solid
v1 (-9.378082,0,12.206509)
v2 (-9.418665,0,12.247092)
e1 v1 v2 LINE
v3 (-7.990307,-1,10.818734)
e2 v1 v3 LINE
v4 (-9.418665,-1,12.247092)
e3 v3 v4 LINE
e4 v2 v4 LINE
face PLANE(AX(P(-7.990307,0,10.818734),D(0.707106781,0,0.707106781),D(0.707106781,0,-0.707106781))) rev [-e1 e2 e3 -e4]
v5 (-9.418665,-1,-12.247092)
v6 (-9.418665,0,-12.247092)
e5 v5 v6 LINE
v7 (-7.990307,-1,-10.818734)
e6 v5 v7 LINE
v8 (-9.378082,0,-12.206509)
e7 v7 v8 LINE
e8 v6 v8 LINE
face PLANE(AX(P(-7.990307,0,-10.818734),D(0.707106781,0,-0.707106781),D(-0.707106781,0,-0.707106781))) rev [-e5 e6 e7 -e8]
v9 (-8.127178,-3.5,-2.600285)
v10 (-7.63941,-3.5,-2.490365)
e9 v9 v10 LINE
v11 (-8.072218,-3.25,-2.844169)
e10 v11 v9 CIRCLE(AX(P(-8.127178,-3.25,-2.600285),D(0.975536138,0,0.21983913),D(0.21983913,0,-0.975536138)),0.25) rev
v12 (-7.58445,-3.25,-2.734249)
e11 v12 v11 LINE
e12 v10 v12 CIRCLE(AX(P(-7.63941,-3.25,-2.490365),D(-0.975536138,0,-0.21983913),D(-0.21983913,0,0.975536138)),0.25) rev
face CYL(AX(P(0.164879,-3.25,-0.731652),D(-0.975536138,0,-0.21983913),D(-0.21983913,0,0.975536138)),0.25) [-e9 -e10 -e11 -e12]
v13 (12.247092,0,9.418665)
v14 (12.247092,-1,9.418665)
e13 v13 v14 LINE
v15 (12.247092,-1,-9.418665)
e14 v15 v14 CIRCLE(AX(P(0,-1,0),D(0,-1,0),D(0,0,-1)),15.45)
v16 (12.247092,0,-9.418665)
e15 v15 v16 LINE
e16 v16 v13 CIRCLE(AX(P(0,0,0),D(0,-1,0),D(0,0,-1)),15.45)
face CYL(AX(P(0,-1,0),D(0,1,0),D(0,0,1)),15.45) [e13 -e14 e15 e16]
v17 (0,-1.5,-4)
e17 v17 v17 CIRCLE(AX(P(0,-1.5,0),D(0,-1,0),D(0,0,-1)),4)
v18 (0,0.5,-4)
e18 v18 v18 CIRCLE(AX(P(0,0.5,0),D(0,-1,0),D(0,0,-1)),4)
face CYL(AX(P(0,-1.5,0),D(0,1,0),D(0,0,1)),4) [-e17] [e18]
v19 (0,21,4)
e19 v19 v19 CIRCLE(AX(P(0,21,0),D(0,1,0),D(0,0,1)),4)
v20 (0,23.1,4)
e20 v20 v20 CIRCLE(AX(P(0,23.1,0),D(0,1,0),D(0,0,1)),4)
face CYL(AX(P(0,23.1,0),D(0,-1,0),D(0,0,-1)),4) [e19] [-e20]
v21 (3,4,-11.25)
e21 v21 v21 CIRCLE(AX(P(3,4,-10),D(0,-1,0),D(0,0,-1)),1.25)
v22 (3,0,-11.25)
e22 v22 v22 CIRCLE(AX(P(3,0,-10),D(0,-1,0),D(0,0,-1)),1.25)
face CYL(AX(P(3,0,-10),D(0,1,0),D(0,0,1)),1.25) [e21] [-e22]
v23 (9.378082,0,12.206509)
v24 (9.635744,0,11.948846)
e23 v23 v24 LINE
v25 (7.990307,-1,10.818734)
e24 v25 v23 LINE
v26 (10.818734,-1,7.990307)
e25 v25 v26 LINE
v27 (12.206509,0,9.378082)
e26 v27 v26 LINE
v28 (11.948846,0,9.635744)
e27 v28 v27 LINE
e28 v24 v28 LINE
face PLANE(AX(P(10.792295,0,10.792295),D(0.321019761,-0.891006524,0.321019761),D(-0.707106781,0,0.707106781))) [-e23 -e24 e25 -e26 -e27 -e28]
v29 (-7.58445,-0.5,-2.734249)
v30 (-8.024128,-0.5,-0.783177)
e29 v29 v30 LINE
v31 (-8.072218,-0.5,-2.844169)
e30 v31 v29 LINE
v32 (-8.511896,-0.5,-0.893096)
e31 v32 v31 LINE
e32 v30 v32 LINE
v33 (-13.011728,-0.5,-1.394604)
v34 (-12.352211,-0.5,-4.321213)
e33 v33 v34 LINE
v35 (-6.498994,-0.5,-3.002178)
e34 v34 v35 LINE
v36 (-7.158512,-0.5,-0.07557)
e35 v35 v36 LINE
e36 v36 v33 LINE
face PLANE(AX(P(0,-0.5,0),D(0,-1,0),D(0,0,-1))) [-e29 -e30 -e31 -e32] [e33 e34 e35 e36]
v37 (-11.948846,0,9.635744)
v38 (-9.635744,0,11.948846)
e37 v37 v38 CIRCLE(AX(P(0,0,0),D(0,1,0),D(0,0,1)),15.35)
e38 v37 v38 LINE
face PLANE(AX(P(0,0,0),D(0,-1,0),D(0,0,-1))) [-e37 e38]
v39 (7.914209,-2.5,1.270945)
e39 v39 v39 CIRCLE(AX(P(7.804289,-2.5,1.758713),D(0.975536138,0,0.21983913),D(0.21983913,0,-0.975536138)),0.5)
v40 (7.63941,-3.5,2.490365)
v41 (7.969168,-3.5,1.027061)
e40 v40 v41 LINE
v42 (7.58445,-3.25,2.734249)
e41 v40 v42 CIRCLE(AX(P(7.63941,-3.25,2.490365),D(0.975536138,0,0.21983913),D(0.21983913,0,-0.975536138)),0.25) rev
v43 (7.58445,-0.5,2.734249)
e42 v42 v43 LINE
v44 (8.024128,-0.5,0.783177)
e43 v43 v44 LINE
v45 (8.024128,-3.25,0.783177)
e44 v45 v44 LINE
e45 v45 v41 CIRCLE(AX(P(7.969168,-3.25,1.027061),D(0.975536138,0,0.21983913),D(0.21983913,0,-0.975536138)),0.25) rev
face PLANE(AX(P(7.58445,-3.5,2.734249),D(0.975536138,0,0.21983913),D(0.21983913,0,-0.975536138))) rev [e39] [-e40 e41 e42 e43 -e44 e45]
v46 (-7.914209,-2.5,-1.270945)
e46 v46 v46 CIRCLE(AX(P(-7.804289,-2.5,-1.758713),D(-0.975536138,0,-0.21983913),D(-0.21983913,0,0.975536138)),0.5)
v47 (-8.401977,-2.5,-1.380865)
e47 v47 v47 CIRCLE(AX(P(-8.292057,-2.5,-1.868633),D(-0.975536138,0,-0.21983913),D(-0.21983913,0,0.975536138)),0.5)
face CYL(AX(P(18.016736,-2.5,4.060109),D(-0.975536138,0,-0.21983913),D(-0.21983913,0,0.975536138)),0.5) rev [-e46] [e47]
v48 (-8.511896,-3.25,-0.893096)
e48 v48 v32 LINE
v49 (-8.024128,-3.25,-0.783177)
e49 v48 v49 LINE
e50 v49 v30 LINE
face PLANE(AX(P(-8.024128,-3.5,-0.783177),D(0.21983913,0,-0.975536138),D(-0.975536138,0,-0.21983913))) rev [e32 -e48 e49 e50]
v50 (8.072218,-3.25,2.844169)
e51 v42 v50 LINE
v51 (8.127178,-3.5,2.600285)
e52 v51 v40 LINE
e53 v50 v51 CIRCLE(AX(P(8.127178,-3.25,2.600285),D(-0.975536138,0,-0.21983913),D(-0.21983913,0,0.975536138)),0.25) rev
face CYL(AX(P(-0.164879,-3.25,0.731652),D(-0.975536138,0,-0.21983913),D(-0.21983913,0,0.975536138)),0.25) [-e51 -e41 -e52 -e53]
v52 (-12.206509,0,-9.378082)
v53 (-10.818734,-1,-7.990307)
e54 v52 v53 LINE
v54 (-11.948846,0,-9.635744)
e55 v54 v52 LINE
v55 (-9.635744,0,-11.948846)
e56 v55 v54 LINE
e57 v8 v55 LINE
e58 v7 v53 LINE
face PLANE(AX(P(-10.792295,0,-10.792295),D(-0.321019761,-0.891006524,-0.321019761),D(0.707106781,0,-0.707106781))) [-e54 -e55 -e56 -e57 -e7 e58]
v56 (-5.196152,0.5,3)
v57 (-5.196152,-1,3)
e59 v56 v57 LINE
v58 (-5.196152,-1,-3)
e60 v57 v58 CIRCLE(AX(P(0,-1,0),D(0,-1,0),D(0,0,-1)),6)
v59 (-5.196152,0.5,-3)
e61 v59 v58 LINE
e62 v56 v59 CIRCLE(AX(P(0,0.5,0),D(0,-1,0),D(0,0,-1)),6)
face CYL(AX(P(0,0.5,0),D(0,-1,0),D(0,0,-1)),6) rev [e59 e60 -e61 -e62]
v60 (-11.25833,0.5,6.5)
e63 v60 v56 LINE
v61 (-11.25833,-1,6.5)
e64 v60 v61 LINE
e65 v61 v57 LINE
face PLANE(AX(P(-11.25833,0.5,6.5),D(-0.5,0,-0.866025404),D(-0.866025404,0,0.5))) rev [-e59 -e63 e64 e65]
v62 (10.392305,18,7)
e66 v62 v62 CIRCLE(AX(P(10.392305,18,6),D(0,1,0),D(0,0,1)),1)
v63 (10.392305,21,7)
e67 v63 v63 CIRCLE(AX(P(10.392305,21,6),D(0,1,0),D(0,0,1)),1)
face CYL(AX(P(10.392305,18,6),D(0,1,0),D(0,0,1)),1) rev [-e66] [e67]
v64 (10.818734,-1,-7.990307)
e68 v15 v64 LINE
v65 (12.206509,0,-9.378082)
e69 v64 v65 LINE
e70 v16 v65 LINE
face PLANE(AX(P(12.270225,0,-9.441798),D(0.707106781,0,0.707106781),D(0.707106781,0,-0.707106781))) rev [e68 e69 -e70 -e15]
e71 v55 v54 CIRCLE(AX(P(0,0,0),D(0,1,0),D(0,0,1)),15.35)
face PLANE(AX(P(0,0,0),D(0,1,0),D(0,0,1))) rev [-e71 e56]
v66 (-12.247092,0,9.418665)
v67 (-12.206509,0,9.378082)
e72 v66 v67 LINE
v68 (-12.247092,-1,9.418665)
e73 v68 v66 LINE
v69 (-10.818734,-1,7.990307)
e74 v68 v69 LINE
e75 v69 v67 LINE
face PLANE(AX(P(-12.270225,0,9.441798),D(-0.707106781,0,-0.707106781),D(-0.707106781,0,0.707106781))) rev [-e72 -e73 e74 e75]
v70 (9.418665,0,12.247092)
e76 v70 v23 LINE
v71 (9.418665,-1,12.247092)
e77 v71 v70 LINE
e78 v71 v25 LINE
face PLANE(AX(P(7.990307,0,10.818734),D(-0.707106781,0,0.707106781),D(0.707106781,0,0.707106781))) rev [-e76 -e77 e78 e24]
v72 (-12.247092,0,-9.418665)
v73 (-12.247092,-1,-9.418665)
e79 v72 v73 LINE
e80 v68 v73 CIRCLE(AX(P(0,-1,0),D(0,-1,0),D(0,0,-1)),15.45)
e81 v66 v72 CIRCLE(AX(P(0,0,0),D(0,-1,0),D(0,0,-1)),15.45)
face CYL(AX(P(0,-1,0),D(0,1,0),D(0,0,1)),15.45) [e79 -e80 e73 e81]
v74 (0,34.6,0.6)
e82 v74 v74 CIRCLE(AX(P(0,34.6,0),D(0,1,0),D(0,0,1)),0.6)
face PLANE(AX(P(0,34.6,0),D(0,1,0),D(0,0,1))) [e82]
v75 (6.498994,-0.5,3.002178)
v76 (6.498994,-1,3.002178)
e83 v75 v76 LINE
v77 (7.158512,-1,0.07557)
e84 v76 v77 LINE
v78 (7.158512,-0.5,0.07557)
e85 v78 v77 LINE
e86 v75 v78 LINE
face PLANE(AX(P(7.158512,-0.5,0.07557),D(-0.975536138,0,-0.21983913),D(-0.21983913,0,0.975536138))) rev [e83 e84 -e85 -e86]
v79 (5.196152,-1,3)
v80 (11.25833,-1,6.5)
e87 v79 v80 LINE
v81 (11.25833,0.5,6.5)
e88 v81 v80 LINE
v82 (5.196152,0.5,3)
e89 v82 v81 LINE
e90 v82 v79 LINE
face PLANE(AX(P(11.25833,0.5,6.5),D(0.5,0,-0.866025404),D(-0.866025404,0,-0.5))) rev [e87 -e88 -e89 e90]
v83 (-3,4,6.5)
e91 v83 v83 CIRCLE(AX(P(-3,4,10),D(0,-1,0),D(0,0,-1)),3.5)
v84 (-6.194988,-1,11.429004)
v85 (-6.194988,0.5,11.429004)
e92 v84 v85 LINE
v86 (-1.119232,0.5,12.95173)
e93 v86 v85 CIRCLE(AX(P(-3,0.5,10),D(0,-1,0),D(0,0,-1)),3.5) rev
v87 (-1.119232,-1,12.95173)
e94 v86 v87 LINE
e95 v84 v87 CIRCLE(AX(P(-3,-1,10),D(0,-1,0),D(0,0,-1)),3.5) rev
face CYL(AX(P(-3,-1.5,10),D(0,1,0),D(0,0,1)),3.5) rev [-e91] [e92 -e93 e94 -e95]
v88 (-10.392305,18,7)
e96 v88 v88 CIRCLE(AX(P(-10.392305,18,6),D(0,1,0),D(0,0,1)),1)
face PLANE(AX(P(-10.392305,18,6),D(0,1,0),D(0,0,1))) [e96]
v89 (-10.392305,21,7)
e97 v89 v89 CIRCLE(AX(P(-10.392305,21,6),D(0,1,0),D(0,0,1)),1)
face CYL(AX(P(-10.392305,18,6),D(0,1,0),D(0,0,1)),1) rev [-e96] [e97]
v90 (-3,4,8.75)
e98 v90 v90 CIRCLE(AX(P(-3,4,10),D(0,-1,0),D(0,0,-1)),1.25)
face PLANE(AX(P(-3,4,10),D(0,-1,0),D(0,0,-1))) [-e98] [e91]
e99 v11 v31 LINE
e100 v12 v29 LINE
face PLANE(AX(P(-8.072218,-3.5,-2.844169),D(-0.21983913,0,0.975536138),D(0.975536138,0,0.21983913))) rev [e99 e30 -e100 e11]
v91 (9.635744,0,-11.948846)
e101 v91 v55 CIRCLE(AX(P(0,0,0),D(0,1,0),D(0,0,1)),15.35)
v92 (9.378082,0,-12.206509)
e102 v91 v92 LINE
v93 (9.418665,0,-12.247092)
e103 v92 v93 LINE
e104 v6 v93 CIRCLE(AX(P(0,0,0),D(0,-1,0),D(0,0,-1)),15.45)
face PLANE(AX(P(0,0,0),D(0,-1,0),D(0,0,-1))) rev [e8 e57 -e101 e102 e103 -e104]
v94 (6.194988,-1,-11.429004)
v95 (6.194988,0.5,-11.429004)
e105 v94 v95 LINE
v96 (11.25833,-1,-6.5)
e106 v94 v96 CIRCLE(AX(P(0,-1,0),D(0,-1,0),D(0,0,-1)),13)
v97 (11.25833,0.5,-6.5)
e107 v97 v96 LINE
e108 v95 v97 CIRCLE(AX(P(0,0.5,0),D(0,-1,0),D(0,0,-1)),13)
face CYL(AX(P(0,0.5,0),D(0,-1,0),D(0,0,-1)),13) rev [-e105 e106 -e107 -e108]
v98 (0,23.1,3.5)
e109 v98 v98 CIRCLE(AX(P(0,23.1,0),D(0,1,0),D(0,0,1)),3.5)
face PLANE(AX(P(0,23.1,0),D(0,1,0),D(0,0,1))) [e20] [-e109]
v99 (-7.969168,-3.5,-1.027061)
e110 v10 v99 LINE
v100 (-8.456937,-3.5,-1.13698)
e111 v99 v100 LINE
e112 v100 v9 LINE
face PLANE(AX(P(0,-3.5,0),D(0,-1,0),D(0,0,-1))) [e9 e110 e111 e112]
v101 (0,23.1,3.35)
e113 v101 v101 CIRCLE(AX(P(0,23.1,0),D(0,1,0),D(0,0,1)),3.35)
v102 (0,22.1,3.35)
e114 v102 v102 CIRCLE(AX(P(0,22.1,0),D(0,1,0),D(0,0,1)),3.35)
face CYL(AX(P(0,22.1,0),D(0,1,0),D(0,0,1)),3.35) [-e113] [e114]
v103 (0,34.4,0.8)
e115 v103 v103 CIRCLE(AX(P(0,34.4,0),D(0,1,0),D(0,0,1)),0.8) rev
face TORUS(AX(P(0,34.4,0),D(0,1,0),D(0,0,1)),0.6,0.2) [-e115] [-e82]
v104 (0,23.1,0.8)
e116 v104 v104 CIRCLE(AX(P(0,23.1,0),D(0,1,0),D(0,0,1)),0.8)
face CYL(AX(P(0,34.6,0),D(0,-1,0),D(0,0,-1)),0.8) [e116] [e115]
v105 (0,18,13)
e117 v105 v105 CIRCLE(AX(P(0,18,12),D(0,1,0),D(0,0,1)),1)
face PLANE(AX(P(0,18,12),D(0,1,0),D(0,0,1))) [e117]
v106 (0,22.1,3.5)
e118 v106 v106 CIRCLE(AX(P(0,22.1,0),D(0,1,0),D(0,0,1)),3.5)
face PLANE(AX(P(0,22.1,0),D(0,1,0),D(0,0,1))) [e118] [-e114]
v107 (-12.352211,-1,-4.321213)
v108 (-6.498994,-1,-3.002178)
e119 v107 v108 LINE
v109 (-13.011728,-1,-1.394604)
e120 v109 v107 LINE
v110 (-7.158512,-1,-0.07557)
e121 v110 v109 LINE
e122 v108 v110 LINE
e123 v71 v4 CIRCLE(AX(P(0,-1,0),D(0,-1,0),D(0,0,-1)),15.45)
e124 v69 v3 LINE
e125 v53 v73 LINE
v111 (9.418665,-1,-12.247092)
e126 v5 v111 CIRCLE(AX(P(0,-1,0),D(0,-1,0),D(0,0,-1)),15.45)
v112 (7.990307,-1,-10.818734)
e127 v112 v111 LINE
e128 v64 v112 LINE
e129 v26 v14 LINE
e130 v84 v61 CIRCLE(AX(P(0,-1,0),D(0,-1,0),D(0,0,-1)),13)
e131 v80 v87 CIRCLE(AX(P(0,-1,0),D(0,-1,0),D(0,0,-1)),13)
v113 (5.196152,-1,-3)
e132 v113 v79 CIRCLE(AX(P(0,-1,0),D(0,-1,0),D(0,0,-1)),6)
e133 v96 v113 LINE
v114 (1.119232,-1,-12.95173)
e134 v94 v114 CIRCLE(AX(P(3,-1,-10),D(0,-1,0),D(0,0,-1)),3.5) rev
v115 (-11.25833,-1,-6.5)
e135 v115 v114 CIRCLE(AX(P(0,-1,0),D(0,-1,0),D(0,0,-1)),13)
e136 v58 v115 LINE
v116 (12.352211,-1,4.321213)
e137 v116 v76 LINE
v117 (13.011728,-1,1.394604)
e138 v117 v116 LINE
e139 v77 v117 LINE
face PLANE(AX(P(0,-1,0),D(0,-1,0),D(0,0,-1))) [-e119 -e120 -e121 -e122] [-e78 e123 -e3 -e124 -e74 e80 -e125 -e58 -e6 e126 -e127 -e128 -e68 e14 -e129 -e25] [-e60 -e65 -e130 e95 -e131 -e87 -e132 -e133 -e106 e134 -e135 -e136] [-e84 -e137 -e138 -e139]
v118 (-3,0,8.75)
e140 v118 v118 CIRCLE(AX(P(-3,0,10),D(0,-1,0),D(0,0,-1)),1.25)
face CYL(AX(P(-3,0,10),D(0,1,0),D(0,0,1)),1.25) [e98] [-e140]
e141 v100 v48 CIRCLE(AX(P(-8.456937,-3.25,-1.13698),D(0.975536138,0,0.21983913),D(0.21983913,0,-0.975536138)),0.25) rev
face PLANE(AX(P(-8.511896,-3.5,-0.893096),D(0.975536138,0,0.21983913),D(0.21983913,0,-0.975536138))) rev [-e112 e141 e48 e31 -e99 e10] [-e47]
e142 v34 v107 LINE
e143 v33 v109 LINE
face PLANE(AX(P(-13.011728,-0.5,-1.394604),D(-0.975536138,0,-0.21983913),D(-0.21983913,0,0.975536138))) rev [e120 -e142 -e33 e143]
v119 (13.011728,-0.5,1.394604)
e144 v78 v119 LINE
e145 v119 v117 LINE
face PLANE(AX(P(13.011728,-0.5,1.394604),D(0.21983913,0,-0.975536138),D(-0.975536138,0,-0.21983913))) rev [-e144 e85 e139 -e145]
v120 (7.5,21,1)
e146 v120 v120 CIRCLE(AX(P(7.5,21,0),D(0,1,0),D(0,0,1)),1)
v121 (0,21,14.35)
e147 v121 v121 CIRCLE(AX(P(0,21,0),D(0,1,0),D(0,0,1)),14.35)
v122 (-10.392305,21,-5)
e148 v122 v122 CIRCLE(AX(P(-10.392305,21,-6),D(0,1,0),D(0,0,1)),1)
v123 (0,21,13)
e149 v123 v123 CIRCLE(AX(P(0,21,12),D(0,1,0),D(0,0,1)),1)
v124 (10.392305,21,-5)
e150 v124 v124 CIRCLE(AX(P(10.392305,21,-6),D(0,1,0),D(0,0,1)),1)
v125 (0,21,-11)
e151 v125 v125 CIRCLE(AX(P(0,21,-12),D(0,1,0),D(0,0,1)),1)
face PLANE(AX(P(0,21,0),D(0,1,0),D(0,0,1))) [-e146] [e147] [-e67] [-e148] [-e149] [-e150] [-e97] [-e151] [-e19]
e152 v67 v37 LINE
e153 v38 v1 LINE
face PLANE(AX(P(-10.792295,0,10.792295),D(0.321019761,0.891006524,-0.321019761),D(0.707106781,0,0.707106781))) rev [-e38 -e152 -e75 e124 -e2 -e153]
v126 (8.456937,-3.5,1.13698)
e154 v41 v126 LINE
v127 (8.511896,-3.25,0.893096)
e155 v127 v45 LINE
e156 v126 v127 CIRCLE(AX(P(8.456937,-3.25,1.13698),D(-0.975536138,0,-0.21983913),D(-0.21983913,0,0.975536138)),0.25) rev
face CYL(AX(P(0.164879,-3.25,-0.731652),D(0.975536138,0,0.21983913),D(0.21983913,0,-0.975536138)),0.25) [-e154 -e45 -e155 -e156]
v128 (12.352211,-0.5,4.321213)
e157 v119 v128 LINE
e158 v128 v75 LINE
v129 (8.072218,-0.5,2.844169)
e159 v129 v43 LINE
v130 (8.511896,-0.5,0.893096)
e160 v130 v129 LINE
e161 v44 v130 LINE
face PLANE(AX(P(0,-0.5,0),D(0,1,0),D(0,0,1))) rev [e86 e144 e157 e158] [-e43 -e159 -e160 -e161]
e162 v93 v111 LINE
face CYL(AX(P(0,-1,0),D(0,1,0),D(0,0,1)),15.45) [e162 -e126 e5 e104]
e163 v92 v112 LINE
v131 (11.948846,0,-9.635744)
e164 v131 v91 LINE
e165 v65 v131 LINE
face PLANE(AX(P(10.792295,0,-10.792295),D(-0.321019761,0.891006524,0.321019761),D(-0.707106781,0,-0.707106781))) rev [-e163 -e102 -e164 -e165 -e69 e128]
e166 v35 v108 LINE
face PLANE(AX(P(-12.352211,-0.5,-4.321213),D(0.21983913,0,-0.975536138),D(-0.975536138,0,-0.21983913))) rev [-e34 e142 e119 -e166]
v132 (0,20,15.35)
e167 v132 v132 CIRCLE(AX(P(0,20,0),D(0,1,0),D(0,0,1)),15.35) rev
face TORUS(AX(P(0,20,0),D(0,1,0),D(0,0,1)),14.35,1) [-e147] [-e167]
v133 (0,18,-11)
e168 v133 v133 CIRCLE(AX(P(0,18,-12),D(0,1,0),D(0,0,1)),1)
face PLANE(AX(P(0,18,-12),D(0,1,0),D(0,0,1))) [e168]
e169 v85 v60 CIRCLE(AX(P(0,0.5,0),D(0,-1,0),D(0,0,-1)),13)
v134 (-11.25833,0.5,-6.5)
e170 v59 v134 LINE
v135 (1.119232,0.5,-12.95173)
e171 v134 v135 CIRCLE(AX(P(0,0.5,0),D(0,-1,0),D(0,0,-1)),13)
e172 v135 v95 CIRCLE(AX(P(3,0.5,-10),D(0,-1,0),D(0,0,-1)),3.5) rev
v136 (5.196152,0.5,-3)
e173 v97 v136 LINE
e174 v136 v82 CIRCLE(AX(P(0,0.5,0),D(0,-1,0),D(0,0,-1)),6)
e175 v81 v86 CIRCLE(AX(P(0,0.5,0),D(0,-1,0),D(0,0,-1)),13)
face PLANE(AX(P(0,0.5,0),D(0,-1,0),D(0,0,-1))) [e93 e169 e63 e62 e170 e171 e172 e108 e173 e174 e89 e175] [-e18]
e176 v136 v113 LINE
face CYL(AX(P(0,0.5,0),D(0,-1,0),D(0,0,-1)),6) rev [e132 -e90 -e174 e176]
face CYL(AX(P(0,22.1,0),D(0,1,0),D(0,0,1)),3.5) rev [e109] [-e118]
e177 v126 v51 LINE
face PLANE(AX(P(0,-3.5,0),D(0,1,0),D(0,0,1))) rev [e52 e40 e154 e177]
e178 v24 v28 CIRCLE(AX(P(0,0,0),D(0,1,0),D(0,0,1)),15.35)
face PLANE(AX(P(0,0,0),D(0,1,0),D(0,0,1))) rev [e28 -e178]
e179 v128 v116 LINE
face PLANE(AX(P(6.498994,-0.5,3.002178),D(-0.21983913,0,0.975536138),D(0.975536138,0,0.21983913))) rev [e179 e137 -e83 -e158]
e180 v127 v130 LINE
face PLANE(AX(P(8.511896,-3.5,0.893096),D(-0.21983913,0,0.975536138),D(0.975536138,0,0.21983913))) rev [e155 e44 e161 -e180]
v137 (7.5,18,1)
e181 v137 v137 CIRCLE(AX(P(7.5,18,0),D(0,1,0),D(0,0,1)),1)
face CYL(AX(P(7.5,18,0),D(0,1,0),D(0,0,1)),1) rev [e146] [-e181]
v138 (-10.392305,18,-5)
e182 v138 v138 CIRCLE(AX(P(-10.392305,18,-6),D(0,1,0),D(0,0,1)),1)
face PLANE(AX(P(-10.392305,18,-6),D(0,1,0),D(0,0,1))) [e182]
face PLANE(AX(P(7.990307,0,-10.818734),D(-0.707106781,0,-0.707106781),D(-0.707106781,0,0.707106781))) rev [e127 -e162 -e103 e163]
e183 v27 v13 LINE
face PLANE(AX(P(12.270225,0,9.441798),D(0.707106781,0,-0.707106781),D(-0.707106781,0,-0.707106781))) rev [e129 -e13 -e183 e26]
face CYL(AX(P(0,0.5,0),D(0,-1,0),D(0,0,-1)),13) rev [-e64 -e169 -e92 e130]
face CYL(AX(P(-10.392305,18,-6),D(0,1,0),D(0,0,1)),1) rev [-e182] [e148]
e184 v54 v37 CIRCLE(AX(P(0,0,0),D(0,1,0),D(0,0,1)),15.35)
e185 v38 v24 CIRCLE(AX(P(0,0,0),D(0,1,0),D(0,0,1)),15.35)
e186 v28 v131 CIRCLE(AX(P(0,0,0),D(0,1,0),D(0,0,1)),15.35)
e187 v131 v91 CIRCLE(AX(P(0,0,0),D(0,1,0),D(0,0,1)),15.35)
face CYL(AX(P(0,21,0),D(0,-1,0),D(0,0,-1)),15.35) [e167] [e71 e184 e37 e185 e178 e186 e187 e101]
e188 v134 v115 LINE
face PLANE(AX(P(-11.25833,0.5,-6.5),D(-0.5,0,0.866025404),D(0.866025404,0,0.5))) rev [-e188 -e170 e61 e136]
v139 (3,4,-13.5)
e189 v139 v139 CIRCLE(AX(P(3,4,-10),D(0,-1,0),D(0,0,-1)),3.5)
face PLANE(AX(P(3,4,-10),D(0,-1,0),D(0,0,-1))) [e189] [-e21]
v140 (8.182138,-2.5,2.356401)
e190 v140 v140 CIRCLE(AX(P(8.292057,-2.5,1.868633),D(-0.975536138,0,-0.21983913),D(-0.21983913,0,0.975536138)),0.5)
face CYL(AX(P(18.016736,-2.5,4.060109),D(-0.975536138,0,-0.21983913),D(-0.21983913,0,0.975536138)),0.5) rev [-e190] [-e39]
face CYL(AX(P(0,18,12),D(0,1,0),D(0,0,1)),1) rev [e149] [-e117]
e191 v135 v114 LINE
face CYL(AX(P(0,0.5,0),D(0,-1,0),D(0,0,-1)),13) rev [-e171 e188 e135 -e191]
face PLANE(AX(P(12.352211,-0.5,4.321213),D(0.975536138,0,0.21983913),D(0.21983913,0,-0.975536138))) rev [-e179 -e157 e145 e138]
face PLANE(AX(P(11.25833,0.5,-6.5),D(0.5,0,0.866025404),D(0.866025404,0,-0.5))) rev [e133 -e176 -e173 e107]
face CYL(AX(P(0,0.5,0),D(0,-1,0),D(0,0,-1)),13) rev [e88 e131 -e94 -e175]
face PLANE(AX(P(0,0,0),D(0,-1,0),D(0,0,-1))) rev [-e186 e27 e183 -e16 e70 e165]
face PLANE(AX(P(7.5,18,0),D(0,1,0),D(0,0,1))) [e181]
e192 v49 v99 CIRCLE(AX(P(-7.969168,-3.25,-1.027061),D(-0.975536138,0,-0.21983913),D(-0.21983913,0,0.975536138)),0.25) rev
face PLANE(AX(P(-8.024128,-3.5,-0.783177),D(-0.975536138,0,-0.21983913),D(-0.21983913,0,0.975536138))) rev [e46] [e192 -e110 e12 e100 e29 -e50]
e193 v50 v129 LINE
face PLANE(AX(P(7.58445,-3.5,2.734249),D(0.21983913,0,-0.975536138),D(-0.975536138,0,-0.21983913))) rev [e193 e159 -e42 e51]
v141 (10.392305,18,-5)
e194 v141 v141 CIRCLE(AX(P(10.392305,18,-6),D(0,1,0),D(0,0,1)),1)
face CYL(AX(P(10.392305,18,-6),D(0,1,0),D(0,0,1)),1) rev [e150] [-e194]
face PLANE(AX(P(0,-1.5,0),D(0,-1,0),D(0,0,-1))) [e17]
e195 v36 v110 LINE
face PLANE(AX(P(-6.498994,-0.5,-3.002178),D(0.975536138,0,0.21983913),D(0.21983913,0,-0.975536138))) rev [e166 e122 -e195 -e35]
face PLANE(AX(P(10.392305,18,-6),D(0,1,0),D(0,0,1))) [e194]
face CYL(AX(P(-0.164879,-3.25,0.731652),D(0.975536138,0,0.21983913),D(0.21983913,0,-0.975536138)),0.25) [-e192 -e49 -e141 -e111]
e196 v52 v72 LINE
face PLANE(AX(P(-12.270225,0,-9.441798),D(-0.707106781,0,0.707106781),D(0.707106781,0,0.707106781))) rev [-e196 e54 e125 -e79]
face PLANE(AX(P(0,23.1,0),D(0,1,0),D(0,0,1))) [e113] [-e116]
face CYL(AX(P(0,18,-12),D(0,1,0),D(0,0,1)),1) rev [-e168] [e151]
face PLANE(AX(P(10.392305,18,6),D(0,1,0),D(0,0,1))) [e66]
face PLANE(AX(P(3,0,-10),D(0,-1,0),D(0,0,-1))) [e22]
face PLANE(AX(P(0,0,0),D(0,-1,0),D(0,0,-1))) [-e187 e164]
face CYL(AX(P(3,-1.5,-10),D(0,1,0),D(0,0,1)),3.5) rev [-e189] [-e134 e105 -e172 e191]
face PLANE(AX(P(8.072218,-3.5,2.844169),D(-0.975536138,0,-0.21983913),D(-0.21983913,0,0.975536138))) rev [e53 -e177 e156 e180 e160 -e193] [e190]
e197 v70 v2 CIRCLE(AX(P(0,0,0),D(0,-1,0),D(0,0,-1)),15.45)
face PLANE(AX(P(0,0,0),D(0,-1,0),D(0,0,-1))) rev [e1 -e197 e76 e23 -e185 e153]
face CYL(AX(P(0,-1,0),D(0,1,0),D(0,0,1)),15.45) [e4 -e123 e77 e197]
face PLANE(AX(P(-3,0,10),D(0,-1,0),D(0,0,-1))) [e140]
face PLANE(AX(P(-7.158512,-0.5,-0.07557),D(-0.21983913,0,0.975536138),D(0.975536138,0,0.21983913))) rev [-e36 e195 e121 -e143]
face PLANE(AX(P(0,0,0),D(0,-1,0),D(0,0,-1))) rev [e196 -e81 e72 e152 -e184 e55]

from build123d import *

# Parameters (mm, degrees)
ESBO_O1_R                  = 15.35
RESSALTO_EXTRUS_O1_DEPTH   = 21
ESBO_O2_R                  = 4
RESSALTO_EXTRUS_O2_DEPTH   = 2.1
ESBO_O3_R                  = 3.5
ESBO_O3_R_2                = 3.35
CORTE_EXTRUS_O1_DEPTH      = 1
ESBO_O4_R                  = 0.8
RESSALTO_EXTRUS_O3_DEPTH   = 11.5
FILETE1_R                  = 0.2
ESBO_O5_R                  = 1
CORTE_EXTRUS_O2_DEPTH      = 3
ESBO_O6_R                  = 1
CORTE_EXTRUS_O3_DEPTH      = 3
FILETE2_R                  = 1
ESBO_O7_R                  = 15.45
RESSALTO_EXTRUS_O4_DEPTH   = 1
CORTE_EXTRUS_O4_DEPTH      = 1.5
RESSALTO_EXTRUS_O5_START   = 2
ESBO_O9_R                  = 4
RESSALTO_EXTRUS_O5_DEPTH   = 2
CORTE_EXTRUS_O5_DEPTH      = 41.499567983
CORTE_EXTRUS_O5_DEPTH_BACK = 3.5
ESBO_O10_R                 = 3.5
ESBO_O11_R                 = 1.25
RESSALTO_EXTRUS_O6_DEPTH   = 4
CORTE_EXTRUS_O6_DEPTH      = 0.5
RESSALTO_EXTRUS_O7_DEPTH   = 3
ESBO_O15_R                 = 0.5
CORTE_EXTRUS_O7_DEPTH      = 46.395818321
FILETE3_R                  = 0.25
CORTE_EXTRUS_O8_DEPTH      = 1
CHANFRO1_SIZE              = 1.962610506
CHANFRO1_SIZE_2            = 1


with BuildPart() as part:
    # Esboço1 → Ressalto-extrusão1 (new body)
    with BuildSketch(Plane(origin=(0, 0, 0), x_dir=(1, 0, 0), z_dir=(0, 1, 0))):
        with Locations(Location((0, 0, 0), (0, 0, 90))):
            Circle(ESBO_O1_R)
    extrude(amount=RESSALTO_EXTRUS_O1_DEPTH)

    # Esboço2 → Ressalto-extrusão2 (add)
    with BuildSketch(Plane(origin=(0, 21, 0), x_dir=(1, 0, 0), z_dir=(0, 1, 0))):
        with Locations(Location((0, 0, 0), (0, 0, 270))):
            Circle(ESBO_O2_R)
    extrude(amount=RESSALTO_EXTRUS_O2_DEPTH)

    # Esboço3 → Corte-extrusão1 (cut)
    with BuildSketch(Plane(origin=(0, 23.1, 0), x_dir=(1, 0, 0), z_dir=(0, 1, 0))):
        with Locations(Location((0, 0, 0), (0, 0, 270))):
            Circle(ESBO_O3_R)
        with Locations(Location((0, 0, 0), (0, 0, 270))):
            Circle(ESBO_O3_R_2, mode=Mode.SUBTRACT)
    extrude(amount=-CORTE_EXTRUS_O1_DEPTH, mode=Mode.SUBTRACT)

    # Esboço4 → Ressalto-extrusão3 (add)
    with BuildSketch(Plane(origin=(0, 23.1, 0), x_dir=(1, 0, 0), z_dir=(0, 1, 0))):
        with Locations(Location((0, 0, 0), (0, 0, 270))):
            Circle(ESBO_O4_R)
    extrude(amount=RESSALTO_EXTRUS_O3_DEPTH)

    # Filete1
    filete1_edges = [part.edges().sort_by_distance(p)[0] for p in [
        (0, 34.6, -0.8),
    ]]
    fillet(filete1_edges, radius=FILETE1_R)

    # Esboço5 → Corte-extrusão2 (cut)
    with BuildSketch(Plane(origin=(0, 21, 0), x_dir=(1, 0, 0), z_dir=(0, 1, 0))):
        with Locations(Location((0, 12, 0), (0, 0, 270))):
            Circle(ESBO_O5_R)
        with Locations(Location((10.392304845, 6, 0), (0, 0, 270))):
            Circle(ESBO_O5_R)
        with Locations(Location((10.392304845, -6, 0), (0, 0, 270))):
            Circle(ESBO_O5_R)
        with Locations(Location((0, -12, 0), (0, 0, 270))):
            Circle(ESBO_O5_R)
        with Locations(Location((-10.392304845, -6, 0), (0, 0, 270))):
            Circle(ESBO_O5_R)
        with Locations(Location((-10.392304845, 6, 0), (0, 0, 270))):
            Circle(ESBO_O5_R)
    extrude(amount=-CORTE_EXTRUS_O2_DEPTH, mode=Mode.SUBTRACT)

    # Esboço6 → Corte-extrusão3 (cut)
    with BuildSketch(Plane(origin=(0, 21, 0), x_dir=(1, 0, 0), z_dir=(0, 1, 0))):
        with Locations(Location((7.5, 0, 0), (0, 0, 270))):
            Circle(ESBO_O6_R)
    extrude(amount=-CORTE_EXTRUS_O3_DEPTH, mode=Mode.SUBTRACT)

    # Filete2
    filete2_edges = [part.edges().sort_by_distance(p)[0] for p in [
        (0, 21, 15.35),
    ]]
    fillet(filete2_edges, radius=FILETE2_R)

    # Esboço7 → Ressalto-extrusão4 (add)
    with BuildSketch(Plane.XZ):
        with Locations(Location((0, 0, 0), (0, 0, 270))):
            Circle(ESBO_O7_R)
    extrude(amount=RESSALTO_EXTRUS_O4_DEPTH)

    # Esboço8 → Corte-extrusão4 (cut)
    with BuildSketch(Plane.XZ.offset(1)):
        with BuildLine():
            Line((-11.258330249, 6.5), (-5.196152423, 3))
            ThreePointArc((-5.196152423, 3), (-6, 0), (-5.196152423, -3))
            Line((-5.196152423, -3), (-11.258330249, -6.5))
            ThreePointArc((-11.258330249, -6.5), (0, -13), (11.258330249, -6.5))
            Line((11.258330249, -6.5), (5.196152423, -3))
            ThreePointArc((5.196152423, -3), (6, 0), (5.196152423, 3))
            Line((5.196152423, 3), (11.258330249, 6.5))
            ThreePointArc((11.258330249, 6.5), (0, 13), (-11.258330249, 6.5))
        make_face()
    extrude(amount=-CORTE_EXTRUS_O4_DEPTH, mode=Mode.SUBTRACT)

    # Esboço9 → Ressalto-extrusão5 (add)
    with BuildSketch(Plane.XZ.offset(-0.5).offset(RESSALTO_EXTRUS_O5_START)):
        with Locations(Location((0, 0, 0), (0, 0, 90))):
            Circle(ESBO_O9_R)
    extrude(amount=-RESSALTO_EXTRUS_O5_DEPTH)

    # Esboço10 → Corte-extrusão5 (cut, two sides: drawn at the far end of the back side and taken through both)
    with BuildSketch(Plane.XZ.offset(-0.5).offset(-CORTE_EXTRUS_O5_DEPTH_BACK)):
        with Locations(Location((-3, 10, 0), (0, 0, 57.495744103))):
            Circle(ESBO_O10_R)
        with Locations(Location((3, -10, 0), (0, 0, 335.902744365))):
            Circle(ESBO_O10_R)
    extrude(amount=CORTE_EXTRUS_O5_DEPTH + CORTE_EXTRUS_O5_DEPTH_BACK, mode=Mode.SUBTRACT)

    # Esboço11 → Ressalto-extrusão6 (add)
    with BuildSketch(Plane.XZ.offset(-4)):
        with Locations(Location((-3, 10, 0), (0, 0, 270))):
            Circle(ESBO_O11_R)
        with Locations(Location((3, -10, 0), (0, 0, 270))):
            Circle(ESBO_O11_R)
    extrude(amount=RESSALTO_EXTRUS_O6_DEPTH)

    # Esboço12 → Corte-extrusão6 (cut)
    with BuildSketch(Plane.XZ.offset(1)):
        Polygon((-6.498994273, -3.002178116), (-7.158511662, -0.075569701), (-13.011728492, -1.394604479), (-12.352211103, -4.321212894), align=None)
        Polygon((13.011728492, 1.394604479), (7.158511662, 0.075569701), (6.498994273, 3.002178116), (12.352211103, 4.321212894), align=None)
    extrude(amount=-CORTE_EXTRUS_O6_DEPTH, mode=Mode.SUBTRACT)

    # Esboço13 → Ressalto-extrusão7 (add)
    with BuildSketch(Plane.XZ.offset(0.5)):
        Polygon((-8.024128236, -0.7831769), (-7.584449976, -2.734249176), (-8.072218045, -2.844168741), (-8.511896305, -0.893096465), align=None)
        Polygon((8.511896305, 0.893096465), (8.024128236, 0.7831769), (7.584449976, 2.734249176), (8.072218045, 2.844168741), align=None)
    extrude(amount=RESSALTO_EXTRUS_O7_DEPTH)

    # Esboço15 → Corte-extrusão7 (cut, through all)
    with BuildSketch(Plane(origin=(-8.292057175, 0, -1.868632603), x_dir=(-0.21983912974654451, 0, 0.9755361382502865), z_dir=(-0.9755361382502864, 0, -0.2198391297465445))):
        with Locations((0, -2.5)):
            Circle(ESBO_O15_R)
    extrude(amount=-CORTE_EXTRUS_O7_DEPTH, mode=Mode.SUBTRACT)

    # Filete3
    filete3_edges = [part.edges().sort_by_distance(p)[0] for p in [
        (-8.26801227, -3.5, -0.838136682),
        (-7.828334011, -3.5, -2.789208959),
        (7.828334011, -3.5, 2.789208959),
        (8.26801227, -3.5, 0.838136682),
    ]]
    fillet(filete3_edges, radius=FILETE3_R)

    # Esboço16 → Corte-extrusão8 (cut)
    with BuildSketch(Plane.XZ.offset(1)):
        with BuildLine():
            Line((-12.270225276, 9.441798151), (-10.818733752, 7.990306627))
            Line((-10.818733752, 7.990306627), (-7.990306627, 10.818733752))
            Line((-7.990306627, 10.818733752), (-9.441798151, 12.270225276))
            ThreePointArc((-9.441798151, 12.270225276), (-10.947739051, 10.947739051), (-12.270225276, 9.441798151))
        make_face()
        with BuildLine():
            Line((7.990306627, 10.818733752), (9.441798151, 12.270225276))
            ThreePointArc((9.441798151, 12.270225276), (10.947739051, 10.947739051), (12.270225276, 9.441798151))
            Line((12.270225276, 9.441798151), (10.818733752, 7.990306627))
            Line((10.818733752, 7.990306627), (7.990306627, 10.818733752))
        make_face()
        with BuildLine():
            Line((12.270225276, -9.441798151), (10.818733752, -7.990306627))
            Line((10.818733752, -7.990306627), (7.990306627, -10.818733752))
            Line((7.990306627, -10.818733752), (9.441798151, -12.270225276))
            ThreePointArc((9.441798151, -12.270225276), (10.947739051, -10.947739051), (12.270225276, -9.441798151))
        make_face()
        with BuildLine():
            Line((-7.990306627, -10.818733752), (-9.441798151, -12.270225276))
            ThreePointArc((-9.441798151, -12.270225276), (-10.947739051, -10.947739051), (-12.270225276, -9.441798151))
            Line((-12.270225276, -9.441798151), (-10.818733752, -7.990306627))
            Line((-10.818733752, -7.990306627), (-7.990306627, -10.818733752))
        make_face()
    extrude(amount=-CORTE_EXTRUS_O8_DEPTH, mode=Mode.SUBTRACT)

    # Chanfro1
    # the kernel refuses this chamfer: 1.962610506, 1 mm, written as the material it adds along each edge
    with BuildSketch(Plane(origin=(10.818733752, 0, 7.990306627), x_dir=(0.7069981009602014, 0.017531984409911067, 0.7069981009601932), z_dir=(-0.7071067811865435, 0, 0.7071067811865517)), Plane(origin=(-10.818733752, 0, -7.990306627), x_dir=(-0.7069981009602017, 0.01753198440991109, -0.7069981009601931), z_dir=(0.7071067811865432, 0, -0.7071067811865519))) as chanfro1_piece_1:
        Polygon((CHANFRO1_SIZE * 0.999846302698, -CHANFRO1_SIZE * 0.0175319844055), (-CHANFRO1_SIZE_2 * 0.0175319844099, -CHANFRO1_SIZE_2 * 0.99984630295), (0, 0), align=None)
    extrude(amount=4)
    with BuildSketch(Plane(origin=(10.818733752, 0, -7.990306627), x_dir=(0.7069981009602014, 0.017531984409911067, -0.7069981009601932), z_dir=(-0.7071067811865435, 0, -0.7071067811865517)), Plane(origin=(-10.818733752, 0, 7.990306627), x_dir=(-0.7069981009602017, 0.01753198440991109, 0.7069981009601931), z_dir=(0.7071067811865432, 0, 0.7071067811865519))) as chanfro1_piece_2:
        Polygon((CHANFRO1_SIZE * 0.999846302698, CHANFRO1_SIZE * 0.0175319844055), (-CHANFRO1_SIZE_2 * 0.0175319844099, CHANFRO1_SIZE_2 * 0.99984630295), (0, 0), align=None)
    extrude(amount=4)


solid = part.part
